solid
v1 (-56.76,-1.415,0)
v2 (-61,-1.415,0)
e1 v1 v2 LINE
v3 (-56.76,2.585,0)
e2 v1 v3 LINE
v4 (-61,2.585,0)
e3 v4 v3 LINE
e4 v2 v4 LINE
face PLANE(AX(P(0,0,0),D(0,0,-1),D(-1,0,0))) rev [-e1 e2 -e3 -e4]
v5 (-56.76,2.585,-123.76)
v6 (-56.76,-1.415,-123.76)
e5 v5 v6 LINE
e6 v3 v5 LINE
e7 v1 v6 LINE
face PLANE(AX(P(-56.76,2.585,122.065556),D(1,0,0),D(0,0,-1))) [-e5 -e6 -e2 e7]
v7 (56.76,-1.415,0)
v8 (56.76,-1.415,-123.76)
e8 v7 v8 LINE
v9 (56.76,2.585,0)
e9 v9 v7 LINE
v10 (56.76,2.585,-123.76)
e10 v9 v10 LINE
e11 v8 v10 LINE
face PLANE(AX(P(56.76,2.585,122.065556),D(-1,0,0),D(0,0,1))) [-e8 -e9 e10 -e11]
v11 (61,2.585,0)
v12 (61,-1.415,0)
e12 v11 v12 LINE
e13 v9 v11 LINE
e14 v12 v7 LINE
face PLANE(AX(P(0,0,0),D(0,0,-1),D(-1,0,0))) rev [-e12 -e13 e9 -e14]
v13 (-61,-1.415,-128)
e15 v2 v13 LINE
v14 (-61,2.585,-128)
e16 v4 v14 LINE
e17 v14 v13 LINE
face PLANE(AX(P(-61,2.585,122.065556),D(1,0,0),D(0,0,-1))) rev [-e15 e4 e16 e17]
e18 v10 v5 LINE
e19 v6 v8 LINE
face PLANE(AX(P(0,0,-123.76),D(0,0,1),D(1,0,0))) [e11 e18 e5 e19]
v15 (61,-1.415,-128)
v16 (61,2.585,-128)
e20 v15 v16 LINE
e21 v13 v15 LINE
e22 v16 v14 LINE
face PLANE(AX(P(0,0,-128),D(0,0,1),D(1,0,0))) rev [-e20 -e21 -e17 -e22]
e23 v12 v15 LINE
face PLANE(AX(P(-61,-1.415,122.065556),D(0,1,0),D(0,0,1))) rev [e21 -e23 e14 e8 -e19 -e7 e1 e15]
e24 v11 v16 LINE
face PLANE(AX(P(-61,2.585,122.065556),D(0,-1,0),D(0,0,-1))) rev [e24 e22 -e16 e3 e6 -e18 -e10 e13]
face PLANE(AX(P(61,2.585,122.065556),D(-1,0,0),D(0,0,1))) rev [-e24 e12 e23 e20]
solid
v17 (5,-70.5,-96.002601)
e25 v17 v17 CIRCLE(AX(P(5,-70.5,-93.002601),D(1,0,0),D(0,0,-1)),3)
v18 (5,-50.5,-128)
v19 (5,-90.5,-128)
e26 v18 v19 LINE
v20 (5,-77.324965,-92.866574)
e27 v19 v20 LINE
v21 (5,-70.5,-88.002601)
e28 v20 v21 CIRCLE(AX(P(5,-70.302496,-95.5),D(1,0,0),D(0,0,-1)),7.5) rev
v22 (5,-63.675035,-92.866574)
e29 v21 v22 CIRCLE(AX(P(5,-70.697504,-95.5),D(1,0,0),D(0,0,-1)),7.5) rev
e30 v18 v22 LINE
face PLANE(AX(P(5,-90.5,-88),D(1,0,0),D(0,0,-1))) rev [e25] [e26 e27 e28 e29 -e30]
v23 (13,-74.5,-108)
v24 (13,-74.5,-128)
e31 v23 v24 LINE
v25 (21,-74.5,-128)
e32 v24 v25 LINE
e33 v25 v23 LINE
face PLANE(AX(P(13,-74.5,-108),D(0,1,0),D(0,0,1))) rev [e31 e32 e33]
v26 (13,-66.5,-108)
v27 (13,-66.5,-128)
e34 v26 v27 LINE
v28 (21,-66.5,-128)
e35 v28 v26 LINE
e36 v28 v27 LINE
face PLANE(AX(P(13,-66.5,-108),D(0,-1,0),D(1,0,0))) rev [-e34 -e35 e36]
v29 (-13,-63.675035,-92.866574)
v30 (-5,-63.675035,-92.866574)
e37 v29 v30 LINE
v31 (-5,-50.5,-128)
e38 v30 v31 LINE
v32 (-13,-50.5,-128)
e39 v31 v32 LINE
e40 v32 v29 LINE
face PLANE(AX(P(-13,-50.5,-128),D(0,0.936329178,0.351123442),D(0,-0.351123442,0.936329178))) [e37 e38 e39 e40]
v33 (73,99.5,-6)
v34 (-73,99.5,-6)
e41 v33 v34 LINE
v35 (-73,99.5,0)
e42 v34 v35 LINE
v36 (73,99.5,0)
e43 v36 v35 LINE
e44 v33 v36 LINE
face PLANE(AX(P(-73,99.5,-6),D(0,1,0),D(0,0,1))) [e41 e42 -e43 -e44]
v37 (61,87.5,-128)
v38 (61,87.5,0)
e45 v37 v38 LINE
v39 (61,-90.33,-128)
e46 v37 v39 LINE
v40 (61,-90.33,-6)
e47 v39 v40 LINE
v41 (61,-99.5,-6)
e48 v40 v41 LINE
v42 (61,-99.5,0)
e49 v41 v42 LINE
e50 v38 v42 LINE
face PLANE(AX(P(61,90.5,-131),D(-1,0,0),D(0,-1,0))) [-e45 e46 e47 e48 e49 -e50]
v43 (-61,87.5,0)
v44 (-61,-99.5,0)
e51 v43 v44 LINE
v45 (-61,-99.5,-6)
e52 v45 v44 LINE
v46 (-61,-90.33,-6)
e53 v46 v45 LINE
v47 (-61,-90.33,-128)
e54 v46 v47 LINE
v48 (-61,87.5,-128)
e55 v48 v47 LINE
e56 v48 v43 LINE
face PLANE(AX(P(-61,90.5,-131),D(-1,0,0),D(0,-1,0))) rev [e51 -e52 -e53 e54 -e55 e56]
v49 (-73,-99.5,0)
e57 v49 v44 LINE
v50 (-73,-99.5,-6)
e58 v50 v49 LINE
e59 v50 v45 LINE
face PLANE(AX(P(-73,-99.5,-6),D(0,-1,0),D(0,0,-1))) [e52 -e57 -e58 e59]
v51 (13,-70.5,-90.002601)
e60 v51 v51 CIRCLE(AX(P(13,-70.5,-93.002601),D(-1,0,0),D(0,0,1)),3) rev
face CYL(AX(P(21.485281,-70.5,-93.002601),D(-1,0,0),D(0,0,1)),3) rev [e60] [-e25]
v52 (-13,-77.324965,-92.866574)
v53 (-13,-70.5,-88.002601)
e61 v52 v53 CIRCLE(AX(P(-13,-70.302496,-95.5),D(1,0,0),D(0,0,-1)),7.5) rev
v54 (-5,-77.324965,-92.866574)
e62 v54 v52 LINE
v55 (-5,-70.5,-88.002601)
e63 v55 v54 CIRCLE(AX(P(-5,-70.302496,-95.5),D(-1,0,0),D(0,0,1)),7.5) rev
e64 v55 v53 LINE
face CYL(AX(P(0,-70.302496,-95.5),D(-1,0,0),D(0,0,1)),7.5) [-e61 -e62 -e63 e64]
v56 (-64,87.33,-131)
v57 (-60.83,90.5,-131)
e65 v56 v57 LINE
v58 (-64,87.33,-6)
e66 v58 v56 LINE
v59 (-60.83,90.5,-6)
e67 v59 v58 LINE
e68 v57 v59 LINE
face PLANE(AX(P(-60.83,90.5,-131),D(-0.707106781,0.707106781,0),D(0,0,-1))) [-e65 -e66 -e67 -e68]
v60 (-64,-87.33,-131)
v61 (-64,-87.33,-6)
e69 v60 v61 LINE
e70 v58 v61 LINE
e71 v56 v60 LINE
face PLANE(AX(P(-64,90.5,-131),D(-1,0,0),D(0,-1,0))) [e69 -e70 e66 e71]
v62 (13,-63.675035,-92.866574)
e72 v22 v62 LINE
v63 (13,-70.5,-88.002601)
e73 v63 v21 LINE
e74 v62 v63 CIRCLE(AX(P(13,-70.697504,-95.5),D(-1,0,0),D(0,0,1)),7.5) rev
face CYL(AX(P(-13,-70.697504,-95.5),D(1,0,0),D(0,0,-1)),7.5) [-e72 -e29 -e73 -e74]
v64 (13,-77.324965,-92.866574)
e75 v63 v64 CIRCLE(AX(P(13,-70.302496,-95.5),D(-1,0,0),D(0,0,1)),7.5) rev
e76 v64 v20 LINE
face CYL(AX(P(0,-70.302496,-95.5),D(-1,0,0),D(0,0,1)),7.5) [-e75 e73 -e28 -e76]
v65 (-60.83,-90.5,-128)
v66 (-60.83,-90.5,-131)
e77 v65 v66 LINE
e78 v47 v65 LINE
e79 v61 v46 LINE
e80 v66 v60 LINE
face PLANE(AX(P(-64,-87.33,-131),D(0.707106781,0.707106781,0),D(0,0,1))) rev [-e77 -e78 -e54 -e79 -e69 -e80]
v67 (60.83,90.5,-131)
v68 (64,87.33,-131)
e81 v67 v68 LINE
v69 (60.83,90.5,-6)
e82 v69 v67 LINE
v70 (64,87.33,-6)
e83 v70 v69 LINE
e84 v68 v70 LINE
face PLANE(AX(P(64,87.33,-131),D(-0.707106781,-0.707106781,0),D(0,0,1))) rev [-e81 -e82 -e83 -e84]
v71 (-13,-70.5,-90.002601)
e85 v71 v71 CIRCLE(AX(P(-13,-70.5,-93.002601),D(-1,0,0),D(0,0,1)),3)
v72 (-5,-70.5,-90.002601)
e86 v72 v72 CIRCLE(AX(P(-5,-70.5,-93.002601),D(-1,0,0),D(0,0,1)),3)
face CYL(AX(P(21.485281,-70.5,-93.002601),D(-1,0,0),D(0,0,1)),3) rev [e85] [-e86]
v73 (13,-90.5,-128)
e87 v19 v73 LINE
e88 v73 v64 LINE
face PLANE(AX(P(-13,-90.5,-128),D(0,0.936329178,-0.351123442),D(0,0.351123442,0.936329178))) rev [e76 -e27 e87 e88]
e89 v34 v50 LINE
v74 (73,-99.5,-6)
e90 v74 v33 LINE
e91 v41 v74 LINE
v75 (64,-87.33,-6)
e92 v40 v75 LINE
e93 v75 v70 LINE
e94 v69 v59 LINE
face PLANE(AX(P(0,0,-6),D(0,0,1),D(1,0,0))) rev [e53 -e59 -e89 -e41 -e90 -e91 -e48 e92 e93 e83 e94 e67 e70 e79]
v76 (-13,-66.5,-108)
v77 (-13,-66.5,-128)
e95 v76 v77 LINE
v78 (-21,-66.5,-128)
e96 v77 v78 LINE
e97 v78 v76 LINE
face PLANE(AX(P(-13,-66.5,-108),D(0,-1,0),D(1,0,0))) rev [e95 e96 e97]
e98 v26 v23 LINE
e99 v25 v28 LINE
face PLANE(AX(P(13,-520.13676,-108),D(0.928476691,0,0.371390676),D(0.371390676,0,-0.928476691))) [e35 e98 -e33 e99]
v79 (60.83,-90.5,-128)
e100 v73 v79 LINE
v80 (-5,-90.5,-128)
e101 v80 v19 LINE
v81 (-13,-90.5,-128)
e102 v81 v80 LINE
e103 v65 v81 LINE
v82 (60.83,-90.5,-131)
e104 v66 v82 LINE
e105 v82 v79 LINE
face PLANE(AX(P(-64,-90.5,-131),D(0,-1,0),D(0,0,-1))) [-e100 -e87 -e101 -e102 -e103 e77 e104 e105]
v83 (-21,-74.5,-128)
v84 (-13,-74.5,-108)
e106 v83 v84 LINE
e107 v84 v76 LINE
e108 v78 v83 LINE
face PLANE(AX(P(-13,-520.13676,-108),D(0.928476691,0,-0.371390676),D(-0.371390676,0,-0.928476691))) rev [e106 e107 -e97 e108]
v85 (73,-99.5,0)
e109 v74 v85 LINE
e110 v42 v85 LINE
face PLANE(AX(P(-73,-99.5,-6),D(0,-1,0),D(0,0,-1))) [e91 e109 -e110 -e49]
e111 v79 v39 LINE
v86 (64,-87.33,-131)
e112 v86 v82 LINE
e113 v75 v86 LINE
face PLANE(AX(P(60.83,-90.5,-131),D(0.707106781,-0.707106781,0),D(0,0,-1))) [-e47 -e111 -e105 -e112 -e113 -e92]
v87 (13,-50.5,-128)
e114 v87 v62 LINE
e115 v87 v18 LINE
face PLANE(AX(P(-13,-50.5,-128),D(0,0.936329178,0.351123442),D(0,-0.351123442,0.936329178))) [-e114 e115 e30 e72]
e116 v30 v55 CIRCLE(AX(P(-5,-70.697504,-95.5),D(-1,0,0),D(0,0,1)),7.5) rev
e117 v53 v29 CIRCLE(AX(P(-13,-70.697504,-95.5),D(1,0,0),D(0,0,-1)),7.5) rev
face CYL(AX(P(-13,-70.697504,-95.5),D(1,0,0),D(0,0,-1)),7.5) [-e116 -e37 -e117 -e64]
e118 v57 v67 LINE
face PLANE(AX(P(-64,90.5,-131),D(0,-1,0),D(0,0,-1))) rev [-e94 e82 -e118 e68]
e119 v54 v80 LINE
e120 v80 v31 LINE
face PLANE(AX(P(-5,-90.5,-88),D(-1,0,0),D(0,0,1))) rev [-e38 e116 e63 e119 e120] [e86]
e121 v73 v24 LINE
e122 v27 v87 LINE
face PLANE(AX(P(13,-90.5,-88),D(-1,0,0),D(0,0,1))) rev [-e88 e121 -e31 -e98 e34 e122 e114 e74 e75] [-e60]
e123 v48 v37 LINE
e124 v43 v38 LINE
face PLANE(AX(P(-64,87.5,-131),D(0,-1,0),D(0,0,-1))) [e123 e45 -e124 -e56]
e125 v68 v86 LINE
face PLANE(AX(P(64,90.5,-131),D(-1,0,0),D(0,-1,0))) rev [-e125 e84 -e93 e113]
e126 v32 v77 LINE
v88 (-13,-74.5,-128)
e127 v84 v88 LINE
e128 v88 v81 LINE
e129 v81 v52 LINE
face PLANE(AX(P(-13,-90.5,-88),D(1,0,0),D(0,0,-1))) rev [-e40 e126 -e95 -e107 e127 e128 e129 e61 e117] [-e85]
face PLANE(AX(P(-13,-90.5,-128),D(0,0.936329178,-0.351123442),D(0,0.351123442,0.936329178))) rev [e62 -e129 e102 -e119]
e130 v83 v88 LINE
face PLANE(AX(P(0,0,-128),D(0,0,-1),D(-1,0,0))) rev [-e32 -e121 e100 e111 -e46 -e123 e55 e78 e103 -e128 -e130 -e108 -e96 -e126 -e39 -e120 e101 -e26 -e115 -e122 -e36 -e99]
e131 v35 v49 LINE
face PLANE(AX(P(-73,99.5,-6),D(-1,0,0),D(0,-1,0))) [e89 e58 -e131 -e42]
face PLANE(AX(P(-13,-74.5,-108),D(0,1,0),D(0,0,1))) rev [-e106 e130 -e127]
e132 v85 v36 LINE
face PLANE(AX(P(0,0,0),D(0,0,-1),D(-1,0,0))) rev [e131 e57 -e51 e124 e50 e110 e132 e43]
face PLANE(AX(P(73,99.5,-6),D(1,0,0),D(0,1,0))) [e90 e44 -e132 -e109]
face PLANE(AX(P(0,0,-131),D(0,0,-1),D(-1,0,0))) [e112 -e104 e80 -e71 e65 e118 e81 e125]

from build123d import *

# Parameters (mm, degrees)
ESQUISSE3_W                  = 128
ESQUISSE3_H                  = 181
BOSS_EXTRU_4_DEPTH           = 131
COQUE2_T                     = -3
CHANFREIN1_SIZE              = 3.17
ESQUISSE4_W                  = 146
ESQUISSE4_H                  = 199
BOSS_EXTRU_5_DEPTH           = 6
ESQUISSE5_W                  = 122
ESQUISSE5_H                  = 9.17
ENL_V_MAT_EXTRU_1_DEPTH      = 6
ESQUISSE6_W                  = 8
ESQUISSE6_H                  = 40
BOSS_EXTRU_6_DEPTH           = 40
ENL_V_MAT_EXTRU_2_DEPTH      = 26
CONG_2_R                     = 7.5
ENL_V_MAT_EXTRU_3_REACH      = 187.627
ESQUISSE8_R                  = 3
ESQUISSE9_W                  = 122
ESQUISSE9_H                  = 4
BOSS_EXTRU_7_DEPTH           = 128
COQUE3_T                     = -4.24
ESQUISSE10_W                 = 8
ESQUISSE10_H                 = 8
BOSS_EXTRU_8_DEPTH           = 20
ENL_V_MAT_EXTRU_4_DEPTH      = 230.708510944
ENL_V_MAT_EXTRU_4_DEPTH_BACK = 21
ESQUISSE12_W                 = 8
ESQUISSE12_H                 = 8
BOSS_EXTRU_9_DEPTH           = 20
ENL_V_START                  = -8
ENL_V_MAT_EXTRU_6_DEPTH      = 8


# Read off the part's stored shape, not the designer's step: Enlèv. mat.-Extru.6
with BuildPart() as part:
    # Esquisse3 → Boss.-Extru.4 (new body)
    with BuildSketch(Plane.XY):
        Rectangle(ESQUISSE3_W, ESQUISSE3_H)
    extrude(amount=-BOSS_EXTRU_4_DEPTH)

    # Coque2
    coque2_openings = [part.faces().sort_by_distance(p)[0] for p in [
        (0, 0, 0),
        (0, -90.5, -65.5),
    ]]
    offset(amount=COQUE2_T, openings=coque2_openings, kind=Kind.INTERSECTION)

    # Chanfrein1
    chanfrein1_edges = [part.edges().sort_by_distance(p)[0] for p in [
        (64, -90.5, -65.5),
        (-64, -90.5, -65.5),
        (-64, 90.5, -65.5),
        (64, 90.5, -65.5),
    ]]
    chamfer(chanfrein1_edges, length=CHANFREIN1_SIZE)

    # Esquisse4 → Boss.-Extru.5 (add)
    with BuildSketch(Plane.XY):
        Rectangle(ESQUISSE4_W, ESQUISSE4_H)
        Polygon((-64, 87.33), (-60.83, 90.5), (60.83, 90.5), (64, 87.33), (64, -87.33), (61, -90.33), (-61, -90.33), (-64, -87.33), align=None, mode=Mode.SUBTRACT)
    extrude(amount=-BOSS_EXTRU_5_DEPTH)

    # Esquisse5 → Enlèv. mat.-Extru.1 (cut)
    with BuildSketch(Plane.XY):
        with Locations((0, -94.915)):
            Rectangle(ESQUISSE5_W, ESQUISSE5_H)
    extrude(amount=-ENL_V_MAT_EXTRU_1_DEPTH, mode=Mode.SUBTRACT)

    # Esquisse6 → Boss.-Extru.6 (add)
    with BuildSketch(Plane.XY.offset(-128)):
        with Locations((9, -70.5)):
            Rectangle(ESQUISSE6_W, ESQUISSE6_H)
        with Locations((-9, -70.5)):
            Rectangle(ESQUISSE6_W, ESQUISSE6_H)
    extrude(amount=BOSS_EXTRU_6_DEPTH)

    # Esquisse7 → Enlèv. mat.-Extru.2 (cut)
    with BuildSketch(Plane(origin=(13, 0, 0), x_dir=(0, 0, -1), z_dir=(1, 0, 0))):
        Polygon((128, -50.5), (88, -65.5), (88, -50.5), align=None)
        Polygon((128, -90.5), (88, -75.5), (88, -90.5), align=None)
    extrude(amount=-ENL_V_MAT_EXTRU_2_DEPTH, mode=Mode.SUBTRACT)

    # Congé2
    # the kernel refuses this fillet: 7.5 mm, written as the material it takes off along each edge
    with BuildSketch(Plane(origin=(25.993758778, -75.5, -88), x_dir=(0, -0.3511234415883899, -0.9363291775690452), z_dir=(-1, 0, 0)), Plane(origin=(7.993758778, -75.5, -88), x_dir=(0, -0.3511234415883899, -0.9363291775690452), z_dir=(-1, 0, 0))) as cong_2_piece_1:
        with BuildLine():
            CenterArc((CONG_2_R * 0.693000468165, -CONG_2_R), CONG_2_R, 90, 69.44395478)
            Line((-CONG_2_R * 0.243328709404, -CONG_2_R * 0.648876558412), (0, 0))
            Line((0, 0), (CONG_2_R * 0.693000468165, 0))
        make_face()
    extrude(amount=33.987517556, mode=Mode.SUBTRACT)
    with BuildSketch(Plane(origin=(7.993758778, -65.5, -88), x_dir=(0, 0.3511234415883905, -0.936329177569045), z_dir=(-1, 0, 0)), Plane(origin=(25.993758778, -65.5, -88), x_dir=(0, 0.3511234415883905, -0.936329177569045), z_dir=(-1, 0, 0))) as cong_2_piece_2:
        with BuildLine():
            CenterArc((CONG_2_R * 0.693000468165, CONG_2_R), CONG_2_R, 200.55604522, 69.44395478)
            Line((-CONG_2_R * 0.243328709404, CONG_2_R * 0.648876558412), (0, 0))
            Line((0, 0), (CONG_2_R * 0.693000468165, 0))
        make_face()
    extrude(amount=33.987517556, mode=Mode.SUBTRACT)

    # Enlèv. mat.-Extru.3: up to this face of the body (flat: up to its plane)
    enl_v_mat_extru_3_end = Plane(part.part.faces().sort_by_distance((13, -70.5, -112.226918248))[0])
    # Esquisse8 → Enlèv. mat.-Extru.3 (cut, up to the picked face)
    with BuildSketch(Plane.ZY.offset(13), mode=Mode.PRIVATE) as enl_v_mat_extru_3_sk1:
        with Locations((-93.00260096, -70.5)):
            Circle(ESQUISSE8_R)
    enl_v_mat_extru_3_tool1 = split(extrude(enl_v_mat_extru_3_sk1.sketch, amount=-ENL_V_MAT_EXTRU_3_REACH, mode=Mode.PRIVATE), bisect_by=enl_v_mat_extru_3_end, keep=Keep.BOTH, mode=Mode.PRIVATE)
    add(enl_v_mat_extru_3_tool1.solids().sort_by(Axis((-13, -70.5, -93.002601), (1, 0, 0)))[0], mode=Mode.SUBTRACT)

    # Esquisse10 → Boss.-Extru.8 (add)
    with BuildSketch(Plane.XY.offset(-128)):
        with Locations((17, -70.5)):
            Rectangle(ESQUISSE10_W, ESQUISSE10_H)
    extrude(amount=BOSS_EXTRU_8_DEPTH)

    # Esquisse11 → Enlèv. mat.-Extru.4 (cut, two sides: drawn at the far end of the back side and taken through both)
    with BuildSketch(Plane.XZ.offset(74.5).offset(-ENL_V_MAT_EXTRU_4_DEPTH_BACK)):
        Polygon((21, -108), (13, -108), (21, -128), align=None)
    extrude(amount=ENL_V_MAT_EXTRU_4_DEPTH + ENL_V_MAT_EXTRU_4_DEPTH_BACK, mode=Mode.SUBTRACT)

    # Esquisse12 → Boss.-Extru.9 (add)
    with BuildSketch(Plane.XY.offset(-128)):
        with Locations((-17, -70.5)):
            Rectangle(ESQUISSE12_W, ESQUISSE12_H)
    extrude(amount=BOSS_EXTRU_9_DEPTH)

    # Enlèv. mat.-Extru.6 outline → Enlèv. mat.-Extru.6 (cut)
    with BuildSketch(Plane.XZ.offset(74.5).offset(ENL_V_START)):
        Polygon((-21, -108), (-21, -128), (-13, -108), align=None)
    extrude(amount=ENL_V_MAT_EXTRU_6_DEPTH, mode=Mode.SUBTRACT)


with BuildPart() as body_2:
    # Esquisse9 → Boss.-Extru.7 (new body)
    with BuildSketch(Plane.XY.offset(-128)):
        with Locations((0, 0.585)):
            Rectangle(ESQUISSE9_W, ESQUISSE9_H)
    extrude(amount=BOSS_EXTRU_7_DEPTH)

    # Coque3
    coque3_openings = [body_2.faces().sort_by_distance(p)[0] for p in [
        (0, 0.585, 0),
        (0, 2.585, -64),
        (0, -1.415, -64),
    ]]
    offset(amount=COQUE3_T, openings=coque3_openings, kind=Kind.INTERSECTION)


solid = Compound([part.part, body_2.part])
